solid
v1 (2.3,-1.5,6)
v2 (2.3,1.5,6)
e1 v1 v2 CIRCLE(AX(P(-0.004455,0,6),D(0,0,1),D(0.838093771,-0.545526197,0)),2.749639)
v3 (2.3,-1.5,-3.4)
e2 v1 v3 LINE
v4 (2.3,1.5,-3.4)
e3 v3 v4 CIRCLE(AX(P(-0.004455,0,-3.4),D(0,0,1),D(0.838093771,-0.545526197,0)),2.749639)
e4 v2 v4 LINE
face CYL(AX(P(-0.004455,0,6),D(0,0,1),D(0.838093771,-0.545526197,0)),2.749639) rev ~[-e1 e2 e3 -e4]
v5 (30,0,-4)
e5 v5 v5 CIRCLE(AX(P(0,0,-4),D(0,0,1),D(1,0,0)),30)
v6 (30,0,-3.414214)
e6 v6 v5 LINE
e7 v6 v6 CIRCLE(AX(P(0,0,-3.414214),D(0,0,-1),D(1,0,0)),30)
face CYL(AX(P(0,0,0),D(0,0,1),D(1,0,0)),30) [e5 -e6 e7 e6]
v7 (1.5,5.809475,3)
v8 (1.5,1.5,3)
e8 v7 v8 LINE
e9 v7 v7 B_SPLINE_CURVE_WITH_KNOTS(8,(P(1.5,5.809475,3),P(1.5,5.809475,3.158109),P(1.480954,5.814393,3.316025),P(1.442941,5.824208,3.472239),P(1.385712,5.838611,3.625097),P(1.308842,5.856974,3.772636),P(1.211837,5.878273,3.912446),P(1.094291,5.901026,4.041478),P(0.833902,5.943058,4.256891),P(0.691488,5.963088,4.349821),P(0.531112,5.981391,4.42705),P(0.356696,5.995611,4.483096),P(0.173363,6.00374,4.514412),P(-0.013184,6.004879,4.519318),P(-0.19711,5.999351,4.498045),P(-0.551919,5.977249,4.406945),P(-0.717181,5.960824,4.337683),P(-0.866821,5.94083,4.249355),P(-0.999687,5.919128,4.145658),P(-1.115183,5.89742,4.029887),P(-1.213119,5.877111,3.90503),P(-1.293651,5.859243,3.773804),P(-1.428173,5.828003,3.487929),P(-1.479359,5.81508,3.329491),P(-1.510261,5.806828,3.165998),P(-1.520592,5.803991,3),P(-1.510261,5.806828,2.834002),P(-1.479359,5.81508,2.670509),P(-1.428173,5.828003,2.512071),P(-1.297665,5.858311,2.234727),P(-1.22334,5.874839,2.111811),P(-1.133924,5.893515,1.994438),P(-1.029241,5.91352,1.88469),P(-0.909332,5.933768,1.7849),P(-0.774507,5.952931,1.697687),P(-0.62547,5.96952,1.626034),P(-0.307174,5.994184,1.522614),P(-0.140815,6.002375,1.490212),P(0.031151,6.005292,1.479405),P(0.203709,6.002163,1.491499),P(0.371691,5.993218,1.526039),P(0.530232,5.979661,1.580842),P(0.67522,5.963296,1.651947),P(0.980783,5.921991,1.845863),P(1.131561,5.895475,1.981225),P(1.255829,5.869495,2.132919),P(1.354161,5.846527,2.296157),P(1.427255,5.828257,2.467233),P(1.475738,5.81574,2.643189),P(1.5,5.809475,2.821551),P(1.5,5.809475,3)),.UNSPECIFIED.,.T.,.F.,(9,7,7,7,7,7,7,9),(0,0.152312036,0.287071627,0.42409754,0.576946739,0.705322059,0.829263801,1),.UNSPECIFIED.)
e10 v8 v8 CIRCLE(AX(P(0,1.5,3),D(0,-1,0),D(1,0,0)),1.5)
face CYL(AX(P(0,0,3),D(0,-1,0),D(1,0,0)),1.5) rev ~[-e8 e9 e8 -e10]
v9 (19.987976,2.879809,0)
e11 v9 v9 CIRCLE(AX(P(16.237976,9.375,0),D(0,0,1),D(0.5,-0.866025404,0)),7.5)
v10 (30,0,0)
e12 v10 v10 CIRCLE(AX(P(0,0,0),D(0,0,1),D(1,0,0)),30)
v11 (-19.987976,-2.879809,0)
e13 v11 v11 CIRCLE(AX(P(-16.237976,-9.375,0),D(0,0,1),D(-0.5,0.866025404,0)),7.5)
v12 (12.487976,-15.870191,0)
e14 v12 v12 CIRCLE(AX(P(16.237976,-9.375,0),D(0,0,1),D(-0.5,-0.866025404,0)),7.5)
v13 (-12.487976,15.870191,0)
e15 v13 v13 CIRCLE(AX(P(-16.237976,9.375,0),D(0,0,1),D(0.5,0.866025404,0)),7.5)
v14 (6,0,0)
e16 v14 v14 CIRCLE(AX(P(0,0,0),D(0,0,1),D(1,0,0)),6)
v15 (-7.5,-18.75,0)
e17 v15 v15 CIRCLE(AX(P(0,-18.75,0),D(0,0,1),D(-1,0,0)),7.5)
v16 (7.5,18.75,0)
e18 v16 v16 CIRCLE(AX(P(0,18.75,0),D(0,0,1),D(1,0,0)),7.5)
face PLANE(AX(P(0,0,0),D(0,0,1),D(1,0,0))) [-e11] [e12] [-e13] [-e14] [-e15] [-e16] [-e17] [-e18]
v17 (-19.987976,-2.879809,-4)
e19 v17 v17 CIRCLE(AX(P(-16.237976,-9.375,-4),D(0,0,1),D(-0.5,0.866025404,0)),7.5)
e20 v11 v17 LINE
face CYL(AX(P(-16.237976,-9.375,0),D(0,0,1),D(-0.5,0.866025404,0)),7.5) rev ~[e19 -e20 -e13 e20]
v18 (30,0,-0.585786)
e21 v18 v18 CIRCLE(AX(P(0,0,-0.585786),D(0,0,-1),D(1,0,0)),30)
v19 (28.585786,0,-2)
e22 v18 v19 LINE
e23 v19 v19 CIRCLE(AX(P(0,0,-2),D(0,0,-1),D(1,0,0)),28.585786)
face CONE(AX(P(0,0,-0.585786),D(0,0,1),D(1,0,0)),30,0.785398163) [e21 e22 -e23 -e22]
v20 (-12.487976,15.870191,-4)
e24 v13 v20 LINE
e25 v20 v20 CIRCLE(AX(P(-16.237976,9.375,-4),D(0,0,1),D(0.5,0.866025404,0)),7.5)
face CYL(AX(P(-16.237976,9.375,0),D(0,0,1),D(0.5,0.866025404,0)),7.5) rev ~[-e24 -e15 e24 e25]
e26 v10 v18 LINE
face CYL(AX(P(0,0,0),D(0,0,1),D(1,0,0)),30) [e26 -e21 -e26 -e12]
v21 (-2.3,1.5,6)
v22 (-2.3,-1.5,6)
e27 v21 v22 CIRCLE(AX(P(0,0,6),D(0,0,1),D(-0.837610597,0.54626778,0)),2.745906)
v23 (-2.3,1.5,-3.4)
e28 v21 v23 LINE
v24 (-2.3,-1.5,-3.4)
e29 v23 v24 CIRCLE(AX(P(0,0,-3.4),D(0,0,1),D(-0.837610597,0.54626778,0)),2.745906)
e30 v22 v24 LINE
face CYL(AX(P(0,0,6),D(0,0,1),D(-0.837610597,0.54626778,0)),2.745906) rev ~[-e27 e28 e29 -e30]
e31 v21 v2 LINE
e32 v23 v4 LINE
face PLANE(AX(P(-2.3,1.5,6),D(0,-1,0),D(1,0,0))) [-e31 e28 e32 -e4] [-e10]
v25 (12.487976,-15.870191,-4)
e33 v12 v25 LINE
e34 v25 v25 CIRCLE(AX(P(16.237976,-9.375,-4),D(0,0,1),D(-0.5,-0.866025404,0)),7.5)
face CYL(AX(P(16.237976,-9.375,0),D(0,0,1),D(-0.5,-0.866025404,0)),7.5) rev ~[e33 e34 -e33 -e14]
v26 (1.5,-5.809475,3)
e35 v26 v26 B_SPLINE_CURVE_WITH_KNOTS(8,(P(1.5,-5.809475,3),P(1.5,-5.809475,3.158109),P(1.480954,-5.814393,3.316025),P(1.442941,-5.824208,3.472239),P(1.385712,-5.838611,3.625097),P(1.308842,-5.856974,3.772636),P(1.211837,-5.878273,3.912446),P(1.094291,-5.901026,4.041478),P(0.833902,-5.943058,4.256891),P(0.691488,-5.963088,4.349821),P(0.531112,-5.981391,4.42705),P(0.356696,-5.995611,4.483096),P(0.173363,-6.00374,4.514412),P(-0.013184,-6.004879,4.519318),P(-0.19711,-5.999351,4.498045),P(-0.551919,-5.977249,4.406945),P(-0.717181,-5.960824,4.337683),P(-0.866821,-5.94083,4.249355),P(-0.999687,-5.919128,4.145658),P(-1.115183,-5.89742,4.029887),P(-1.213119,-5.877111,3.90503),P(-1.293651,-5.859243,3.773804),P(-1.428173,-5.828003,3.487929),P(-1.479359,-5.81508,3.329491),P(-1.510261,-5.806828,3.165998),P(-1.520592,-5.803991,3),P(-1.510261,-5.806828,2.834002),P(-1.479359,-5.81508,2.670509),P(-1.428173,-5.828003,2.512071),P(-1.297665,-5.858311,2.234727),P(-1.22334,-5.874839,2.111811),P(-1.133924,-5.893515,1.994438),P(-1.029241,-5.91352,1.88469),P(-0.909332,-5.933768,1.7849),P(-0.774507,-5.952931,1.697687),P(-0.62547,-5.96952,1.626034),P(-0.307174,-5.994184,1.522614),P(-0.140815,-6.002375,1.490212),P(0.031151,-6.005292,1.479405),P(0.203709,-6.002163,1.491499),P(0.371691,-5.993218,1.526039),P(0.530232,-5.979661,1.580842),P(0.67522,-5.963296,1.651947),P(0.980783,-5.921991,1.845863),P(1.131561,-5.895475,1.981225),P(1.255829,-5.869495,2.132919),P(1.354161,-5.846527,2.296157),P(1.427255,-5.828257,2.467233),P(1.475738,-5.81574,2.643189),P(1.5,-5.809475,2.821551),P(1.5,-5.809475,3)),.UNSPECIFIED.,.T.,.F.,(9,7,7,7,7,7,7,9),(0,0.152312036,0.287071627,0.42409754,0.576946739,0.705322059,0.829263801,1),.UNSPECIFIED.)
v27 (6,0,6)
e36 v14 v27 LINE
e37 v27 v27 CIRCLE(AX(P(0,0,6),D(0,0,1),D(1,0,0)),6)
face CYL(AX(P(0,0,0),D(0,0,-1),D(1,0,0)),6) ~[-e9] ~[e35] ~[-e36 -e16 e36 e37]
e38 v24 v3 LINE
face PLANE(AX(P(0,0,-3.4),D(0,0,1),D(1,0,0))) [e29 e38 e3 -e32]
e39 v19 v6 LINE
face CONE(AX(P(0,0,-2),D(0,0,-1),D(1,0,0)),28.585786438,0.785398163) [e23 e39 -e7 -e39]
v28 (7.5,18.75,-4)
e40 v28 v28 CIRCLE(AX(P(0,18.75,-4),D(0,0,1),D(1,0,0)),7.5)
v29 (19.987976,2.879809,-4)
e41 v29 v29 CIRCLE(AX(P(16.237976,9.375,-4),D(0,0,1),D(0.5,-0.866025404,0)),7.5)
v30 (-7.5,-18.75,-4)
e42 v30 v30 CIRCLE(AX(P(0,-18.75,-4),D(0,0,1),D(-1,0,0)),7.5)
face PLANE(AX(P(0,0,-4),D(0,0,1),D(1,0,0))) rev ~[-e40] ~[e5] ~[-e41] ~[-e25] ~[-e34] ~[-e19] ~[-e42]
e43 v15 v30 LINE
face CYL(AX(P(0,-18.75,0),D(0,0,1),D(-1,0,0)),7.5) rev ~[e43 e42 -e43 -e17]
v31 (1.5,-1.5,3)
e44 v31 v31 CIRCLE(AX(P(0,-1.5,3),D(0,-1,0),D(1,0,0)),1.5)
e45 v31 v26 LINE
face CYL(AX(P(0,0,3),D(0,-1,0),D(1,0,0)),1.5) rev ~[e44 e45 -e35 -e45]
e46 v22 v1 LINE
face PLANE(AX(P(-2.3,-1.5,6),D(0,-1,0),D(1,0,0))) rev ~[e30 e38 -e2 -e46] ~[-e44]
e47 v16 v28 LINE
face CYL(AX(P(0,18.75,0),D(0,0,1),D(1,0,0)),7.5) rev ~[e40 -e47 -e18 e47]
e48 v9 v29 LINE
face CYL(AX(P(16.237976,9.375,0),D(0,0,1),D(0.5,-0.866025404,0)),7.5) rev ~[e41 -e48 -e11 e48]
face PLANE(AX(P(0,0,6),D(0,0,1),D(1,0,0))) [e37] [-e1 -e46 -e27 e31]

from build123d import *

# Parameters (mm, degrees)
F0_R             = 30
F0_R_2           = 6
F1_DEPTH         = 4
F2_DEPTH         = 6
F3_R             = 1.5
F4_DEPTH         = 12.5
F5_W             = 4.6
F5_H             = 3
F6_DEPTH         = 9.4
F9_R             = 7.5
F10_DEPTH        = 25
F10_COPIES_COUNT = 6


# Not quite as in the source:
# - a pattern or mirror of a feature is missing from the dataset's text; its kind, count and spacing are read off the source's solid


with BuildPart() as f1:
    # F0 (on Top) → F1 (new body)
    with BuildSketch(Plane.XY):
        Circle(F0_R)
        Circle(F0_R_2, mode=Mode.SUBTRACT)
        Circle(F0_R_2)
    extrude(amount=-F1_DEPTH)

    # F0 (on Top) → F2 (join)
    with BuildSketch(Plane.XY):
        Circle(F0_R_2)
    extrude(amount=F2_DEPTH)

    # F3 (on Front) → F4 (cut, symmetric)
    with BuildSketch(Plane.XZ):
        with Locations((0, 3)):
            Circle(F3_R)
    extrude(amount=F4_DEPTH, both=True, mode=Mode.SUBTRACT)

    # F5 (on face) → F6 (cut)
    with BuildSketch(Plane.XY.offset(6)):
        Rectangle(F5_W, F5_H)
        with BuildLine():
            ThreePointArc((-2.3, 1.5), (-2.7459060435, 0), (-2.3, -1.5))
            Line((-2.3, -1.5), (-2.3, 1.5))
        make_face()
        with BuildLine():
            Line((2.3, 1.5), (2.3, -1.5))
            ThreePointArc((2.3, -1.5), (2.745183651, 0), (2.3, 1.5))
        make_face()
    extrude(amount=-F6_DEPTH, mode=Mode.SUBTRACT)

    # F7 (on Front) → F8 (revolve, cut)
    with BuildSketch(Plane.XZ):
        Polygon((30, -3.4142135624), (30, -0.5857864376), (28.5857864376, -2), align=None)
    revolve(axis=Axis((0, 0, 0.7614716887), (0, 0, -1)), mode=Mode.SUBTRACT)

    # F9 (on face) → F10 (cut)
    with BuildSketch(Plane.XY):
        with Locations((0, 18.75)):
            Circle(F9_R)
    f10 = extrude(amount=-F10_DEPTH, mode=Mode.SUBTRACT)

    # F10_copies: F10 ×6 about axis
    f10_copies_axis = Axis((0, 0, 0), (0, 0, 1))
    for i in range(1, F10_COPIES_COUNT):
        add(f10.rotate(f10_copies_axis, i * 360 / F10_COPIES_COUNT), mode=Mode.SUBTRACT)


solid = f1.part
